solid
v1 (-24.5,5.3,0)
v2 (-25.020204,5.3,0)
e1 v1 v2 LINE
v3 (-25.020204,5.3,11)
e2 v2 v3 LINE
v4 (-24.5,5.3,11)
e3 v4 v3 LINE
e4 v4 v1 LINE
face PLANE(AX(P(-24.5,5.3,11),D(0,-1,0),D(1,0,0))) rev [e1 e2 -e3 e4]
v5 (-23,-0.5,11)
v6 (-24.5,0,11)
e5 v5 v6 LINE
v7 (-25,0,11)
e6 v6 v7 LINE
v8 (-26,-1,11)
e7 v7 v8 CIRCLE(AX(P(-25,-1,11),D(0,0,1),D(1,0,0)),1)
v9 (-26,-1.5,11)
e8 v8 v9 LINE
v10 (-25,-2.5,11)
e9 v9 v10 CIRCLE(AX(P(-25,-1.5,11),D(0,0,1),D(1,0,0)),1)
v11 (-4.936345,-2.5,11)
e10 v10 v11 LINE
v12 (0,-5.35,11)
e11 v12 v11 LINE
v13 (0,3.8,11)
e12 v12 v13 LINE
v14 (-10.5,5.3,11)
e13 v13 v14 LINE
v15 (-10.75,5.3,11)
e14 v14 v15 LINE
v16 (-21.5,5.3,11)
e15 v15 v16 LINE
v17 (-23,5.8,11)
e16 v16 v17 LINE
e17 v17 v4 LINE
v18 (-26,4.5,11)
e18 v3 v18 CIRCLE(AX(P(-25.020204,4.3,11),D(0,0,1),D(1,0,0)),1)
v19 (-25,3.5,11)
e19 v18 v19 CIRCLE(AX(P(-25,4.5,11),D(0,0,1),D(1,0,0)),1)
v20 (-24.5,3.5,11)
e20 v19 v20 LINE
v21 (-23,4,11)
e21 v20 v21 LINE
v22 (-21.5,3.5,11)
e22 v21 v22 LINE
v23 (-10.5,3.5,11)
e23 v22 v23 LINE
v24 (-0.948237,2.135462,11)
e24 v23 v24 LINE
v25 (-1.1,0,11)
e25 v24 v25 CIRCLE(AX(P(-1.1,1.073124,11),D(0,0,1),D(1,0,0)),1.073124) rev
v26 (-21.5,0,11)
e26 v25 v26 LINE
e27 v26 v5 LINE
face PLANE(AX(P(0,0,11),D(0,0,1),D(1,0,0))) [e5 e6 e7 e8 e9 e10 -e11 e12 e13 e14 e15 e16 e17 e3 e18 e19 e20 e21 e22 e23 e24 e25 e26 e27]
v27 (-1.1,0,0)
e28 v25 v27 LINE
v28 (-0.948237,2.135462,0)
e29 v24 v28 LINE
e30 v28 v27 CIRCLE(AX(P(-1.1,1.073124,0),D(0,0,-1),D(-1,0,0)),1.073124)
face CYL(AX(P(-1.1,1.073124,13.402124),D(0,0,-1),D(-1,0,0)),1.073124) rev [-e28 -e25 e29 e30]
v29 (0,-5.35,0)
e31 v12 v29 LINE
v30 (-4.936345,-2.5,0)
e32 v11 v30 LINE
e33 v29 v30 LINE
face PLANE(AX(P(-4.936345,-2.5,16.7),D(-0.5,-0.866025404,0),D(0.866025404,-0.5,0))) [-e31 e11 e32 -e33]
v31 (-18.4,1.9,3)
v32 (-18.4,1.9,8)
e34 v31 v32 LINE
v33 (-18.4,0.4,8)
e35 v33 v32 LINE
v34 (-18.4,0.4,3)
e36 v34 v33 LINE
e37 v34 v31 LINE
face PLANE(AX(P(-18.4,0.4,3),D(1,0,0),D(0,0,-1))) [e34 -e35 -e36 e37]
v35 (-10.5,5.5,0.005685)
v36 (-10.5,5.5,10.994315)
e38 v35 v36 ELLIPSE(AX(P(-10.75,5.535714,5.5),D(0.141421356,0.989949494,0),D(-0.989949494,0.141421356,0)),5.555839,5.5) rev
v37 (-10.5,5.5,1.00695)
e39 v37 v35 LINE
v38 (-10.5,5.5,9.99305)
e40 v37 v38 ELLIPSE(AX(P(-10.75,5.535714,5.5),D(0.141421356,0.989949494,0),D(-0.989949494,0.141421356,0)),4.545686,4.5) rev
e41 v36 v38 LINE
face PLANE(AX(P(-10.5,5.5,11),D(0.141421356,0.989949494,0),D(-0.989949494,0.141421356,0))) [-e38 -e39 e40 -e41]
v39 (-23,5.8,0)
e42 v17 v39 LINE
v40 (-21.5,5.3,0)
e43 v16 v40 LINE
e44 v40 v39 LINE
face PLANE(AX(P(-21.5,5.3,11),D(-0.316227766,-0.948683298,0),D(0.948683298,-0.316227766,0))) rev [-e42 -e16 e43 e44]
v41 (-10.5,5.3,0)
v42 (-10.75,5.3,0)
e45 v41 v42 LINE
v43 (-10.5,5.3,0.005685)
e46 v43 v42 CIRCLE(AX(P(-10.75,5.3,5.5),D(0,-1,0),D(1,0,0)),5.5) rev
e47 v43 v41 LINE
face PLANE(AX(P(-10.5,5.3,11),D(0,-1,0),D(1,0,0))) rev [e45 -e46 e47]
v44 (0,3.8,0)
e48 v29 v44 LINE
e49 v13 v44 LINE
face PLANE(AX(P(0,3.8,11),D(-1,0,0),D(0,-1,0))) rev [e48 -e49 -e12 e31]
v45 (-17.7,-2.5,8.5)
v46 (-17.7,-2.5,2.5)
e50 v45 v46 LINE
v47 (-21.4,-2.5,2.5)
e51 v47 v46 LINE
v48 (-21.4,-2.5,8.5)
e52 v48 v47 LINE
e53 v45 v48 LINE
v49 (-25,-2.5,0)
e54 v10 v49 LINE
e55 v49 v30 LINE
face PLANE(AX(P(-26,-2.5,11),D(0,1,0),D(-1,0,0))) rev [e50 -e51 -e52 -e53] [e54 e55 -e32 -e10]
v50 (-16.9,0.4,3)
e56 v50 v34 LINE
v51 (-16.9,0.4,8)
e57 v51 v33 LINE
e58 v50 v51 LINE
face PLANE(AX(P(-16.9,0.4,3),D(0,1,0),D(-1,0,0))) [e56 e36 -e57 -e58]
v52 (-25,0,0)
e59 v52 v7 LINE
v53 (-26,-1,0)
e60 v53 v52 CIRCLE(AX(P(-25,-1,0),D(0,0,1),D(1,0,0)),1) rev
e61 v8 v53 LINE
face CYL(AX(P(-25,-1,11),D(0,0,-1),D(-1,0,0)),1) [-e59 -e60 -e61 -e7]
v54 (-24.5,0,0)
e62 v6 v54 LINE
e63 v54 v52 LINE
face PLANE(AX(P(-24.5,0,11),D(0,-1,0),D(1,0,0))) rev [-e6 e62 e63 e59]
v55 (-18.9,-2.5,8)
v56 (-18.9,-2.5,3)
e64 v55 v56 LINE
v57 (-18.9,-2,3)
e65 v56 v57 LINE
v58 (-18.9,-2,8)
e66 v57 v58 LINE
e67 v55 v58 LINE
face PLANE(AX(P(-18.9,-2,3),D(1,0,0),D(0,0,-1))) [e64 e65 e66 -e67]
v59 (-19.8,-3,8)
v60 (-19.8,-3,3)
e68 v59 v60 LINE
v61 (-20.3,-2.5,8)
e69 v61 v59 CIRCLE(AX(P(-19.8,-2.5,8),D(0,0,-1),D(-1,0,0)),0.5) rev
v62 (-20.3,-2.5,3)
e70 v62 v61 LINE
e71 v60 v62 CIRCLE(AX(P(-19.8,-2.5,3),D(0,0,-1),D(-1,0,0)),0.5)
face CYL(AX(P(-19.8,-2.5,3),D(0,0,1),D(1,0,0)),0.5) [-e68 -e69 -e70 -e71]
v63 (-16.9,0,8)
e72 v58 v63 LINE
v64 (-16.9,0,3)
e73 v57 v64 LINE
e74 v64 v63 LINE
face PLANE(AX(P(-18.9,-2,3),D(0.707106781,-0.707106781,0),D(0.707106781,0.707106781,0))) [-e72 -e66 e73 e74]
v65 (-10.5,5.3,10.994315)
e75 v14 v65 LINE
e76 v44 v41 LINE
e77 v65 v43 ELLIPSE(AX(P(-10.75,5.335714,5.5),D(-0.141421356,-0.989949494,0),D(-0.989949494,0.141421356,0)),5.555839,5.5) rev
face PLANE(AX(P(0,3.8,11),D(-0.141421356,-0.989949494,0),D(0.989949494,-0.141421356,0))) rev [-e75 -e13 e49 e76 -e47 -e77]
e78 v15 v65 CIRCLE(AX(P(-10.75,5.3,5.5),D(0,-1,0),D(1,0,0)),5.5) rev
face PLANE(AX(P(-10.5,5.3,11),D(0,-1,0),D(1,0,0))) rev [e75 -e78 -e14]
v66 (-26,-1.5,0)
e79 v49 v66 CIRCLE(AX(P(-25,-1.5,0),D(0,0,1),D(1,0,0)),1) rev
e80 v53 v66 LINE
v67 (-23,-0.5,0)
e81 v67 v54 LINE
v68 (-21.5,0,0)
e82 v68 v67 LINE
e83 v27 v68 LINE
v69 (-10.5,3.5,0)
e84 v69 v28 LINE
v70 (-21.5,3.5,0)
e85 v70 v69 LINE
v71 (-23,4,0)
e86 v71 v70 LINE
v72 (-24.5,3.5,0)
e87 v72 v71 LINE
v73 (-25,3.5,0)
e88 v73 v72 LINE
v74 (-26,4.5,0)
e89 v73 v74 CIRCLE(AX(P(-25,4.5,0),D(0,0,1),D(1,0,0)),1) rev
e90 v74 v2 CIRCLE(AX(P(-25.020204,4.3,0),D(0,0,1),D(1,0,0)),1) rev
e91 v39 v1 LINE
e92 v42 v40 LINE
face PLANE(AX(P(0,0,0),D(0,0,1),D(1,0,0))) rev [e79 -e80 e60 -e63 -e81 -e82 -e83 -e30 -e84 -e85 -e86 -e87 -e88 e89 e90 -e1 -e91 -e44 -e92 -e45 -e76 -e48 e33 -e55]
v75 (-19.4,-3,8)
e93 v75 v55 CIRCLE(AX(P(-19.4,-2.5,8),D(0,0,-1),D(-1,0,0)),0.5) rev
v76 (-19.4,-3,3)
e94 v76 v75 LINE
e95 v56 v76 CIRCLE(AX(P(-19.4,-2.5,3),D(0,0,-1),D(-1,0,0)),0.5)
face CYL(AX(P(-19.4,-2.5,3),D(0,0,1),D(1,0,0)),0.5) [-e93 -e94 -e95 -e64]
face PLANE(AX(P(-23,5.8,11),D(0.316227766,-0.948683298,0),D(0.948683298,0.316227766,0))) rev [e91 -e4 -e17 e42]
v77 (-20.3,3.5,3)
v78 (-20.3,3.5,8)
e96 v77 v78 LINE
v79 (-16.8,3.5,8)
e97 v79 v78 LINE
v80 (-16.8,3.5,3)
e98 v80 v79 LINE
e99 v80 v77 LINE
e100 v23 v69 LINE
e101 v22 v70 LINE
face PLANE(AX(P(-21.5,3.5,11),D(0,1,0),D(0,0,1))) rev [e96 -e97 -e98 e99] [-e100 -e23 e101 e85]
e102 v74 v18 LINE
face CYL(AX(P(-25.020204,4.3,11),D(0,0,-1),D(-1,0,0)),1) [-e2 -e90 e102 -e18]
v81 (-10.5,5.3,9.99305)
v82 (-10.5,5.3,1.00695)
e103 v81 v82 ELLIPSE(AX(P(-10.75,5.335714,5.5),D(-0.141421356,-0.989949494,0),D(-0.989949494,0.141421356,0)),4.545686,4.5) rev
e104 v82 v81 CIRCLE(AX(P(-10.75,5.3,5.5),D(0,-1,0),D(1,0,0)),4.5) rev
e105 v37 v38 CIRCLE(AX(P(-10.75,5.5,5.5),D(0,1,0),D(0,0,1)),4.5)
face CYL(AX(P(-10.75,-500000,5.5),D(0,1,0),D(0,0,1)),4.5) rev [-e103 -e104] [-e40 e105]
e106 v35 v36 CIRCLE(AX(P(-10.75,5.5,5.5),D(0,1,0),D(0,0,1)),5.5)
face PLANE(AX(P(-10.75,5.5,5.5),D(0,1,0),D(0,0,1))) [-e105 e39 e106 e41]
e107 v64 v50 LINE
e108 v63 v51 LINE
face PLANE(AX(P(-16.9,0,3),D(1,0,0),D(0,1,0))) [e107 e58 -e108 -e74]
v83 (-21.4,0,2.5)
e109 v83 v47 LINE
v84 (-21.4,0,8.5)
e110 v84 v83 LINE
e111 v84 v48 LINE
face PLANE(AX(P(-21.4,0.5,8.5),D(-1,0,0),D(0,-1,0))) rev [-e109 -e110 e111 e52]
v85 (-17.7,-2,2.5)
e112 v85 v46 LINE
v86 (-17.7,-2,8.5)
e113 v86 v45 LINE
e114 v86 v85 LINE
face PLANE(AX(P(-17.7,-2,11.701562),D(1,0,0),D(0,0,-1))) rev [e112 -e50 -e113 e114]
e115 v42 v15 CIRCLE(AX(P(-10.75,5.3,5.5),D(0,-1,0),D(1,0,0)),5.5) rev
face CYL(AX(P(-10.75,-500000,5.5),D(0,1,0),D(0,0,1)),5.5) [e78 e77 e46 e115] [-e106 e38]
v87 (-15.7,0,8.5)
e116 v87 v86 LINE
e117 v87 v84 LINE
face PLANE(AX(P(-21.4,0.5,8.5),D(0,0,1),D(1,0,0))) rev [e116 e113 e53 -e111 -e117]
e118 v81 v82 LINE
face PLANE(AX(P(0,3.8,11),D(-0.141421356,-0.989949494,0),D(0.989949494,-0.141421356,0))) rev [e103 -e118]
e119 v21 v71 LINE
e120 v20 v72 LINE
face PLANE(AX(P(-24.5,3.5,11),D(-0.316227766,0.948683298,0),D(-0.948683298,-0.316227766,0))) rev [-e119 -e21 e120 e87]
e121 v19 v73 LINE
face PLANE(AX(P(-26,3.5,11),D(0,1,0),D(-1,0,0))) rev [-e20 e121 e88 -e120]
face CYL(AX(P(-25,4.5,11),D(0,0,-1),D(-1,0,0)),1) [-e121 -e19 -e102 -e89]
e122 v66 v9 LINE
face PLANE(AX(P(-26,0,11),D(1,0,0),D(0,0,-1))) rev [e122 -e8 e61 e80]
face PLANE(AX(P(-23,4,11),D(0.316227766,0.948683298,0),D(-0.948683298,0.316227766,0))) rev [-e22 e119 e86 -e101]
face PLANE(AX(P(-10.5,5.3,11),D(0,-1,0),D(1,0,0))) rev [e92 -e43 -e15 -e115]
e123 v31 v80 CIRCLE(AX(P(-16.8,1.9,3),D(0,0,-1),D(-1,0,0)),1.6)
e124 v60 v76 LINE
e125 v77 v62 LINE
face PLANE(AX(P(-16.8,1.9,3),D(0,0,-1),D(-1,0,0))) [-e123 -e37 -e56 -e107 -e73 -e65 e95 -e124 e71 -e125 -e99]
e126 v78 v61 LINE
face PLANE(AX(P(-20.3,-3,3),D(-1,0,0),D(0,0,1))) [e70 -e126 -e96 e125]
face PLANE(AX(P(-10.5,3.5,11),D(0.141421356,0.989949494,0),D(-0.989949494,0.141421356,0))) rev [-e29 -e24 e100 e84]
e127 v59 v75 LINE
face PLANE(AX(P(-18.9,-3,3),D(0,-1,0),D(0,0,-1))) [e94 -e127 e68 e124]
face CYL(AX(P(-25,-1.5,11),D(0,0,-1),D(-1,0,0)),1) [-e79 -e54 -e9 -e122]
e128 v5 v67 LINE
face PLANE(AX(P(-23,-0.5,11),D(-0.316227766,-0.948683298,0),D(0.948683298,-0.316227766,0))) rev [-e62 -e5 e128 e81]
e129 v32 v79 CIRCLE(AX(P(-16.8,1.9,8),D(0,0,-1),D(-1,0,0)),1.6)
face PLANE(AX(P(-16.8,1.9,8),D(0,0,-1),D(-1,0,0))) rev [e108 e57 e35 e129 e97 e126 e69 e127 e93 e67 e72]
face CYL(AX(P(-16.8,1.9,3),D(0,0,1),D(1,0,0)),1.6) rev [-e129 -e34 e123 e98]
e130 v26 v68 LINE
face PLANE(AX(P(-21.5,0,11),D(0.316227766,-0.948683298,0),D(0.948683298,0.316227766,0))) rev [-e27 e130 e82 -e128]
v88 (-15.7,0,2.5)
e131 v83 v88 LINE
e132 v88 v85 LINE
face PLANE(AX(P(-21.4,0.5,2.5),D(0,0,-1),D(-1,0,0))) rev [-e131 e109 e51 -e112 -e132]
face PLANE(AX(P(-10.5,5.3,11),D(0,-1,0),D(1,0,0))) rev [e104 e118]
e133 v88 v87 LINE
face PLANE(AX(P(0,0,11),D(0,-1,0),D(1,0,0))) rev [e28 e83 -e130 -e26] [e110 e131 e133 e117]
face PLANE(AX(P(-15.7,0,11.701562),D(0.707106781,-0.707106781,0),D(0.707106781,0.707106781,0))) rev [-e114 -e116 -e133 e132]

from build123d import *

# Parameters (mm, degrees)
BOSS_EXTRUDE1_DEPTH   = 11
BOSS_EXTRUDE1_2_DEPTH = 11
SKETCH2_W             = 5.7
SKETCH2_H             = 6
CUT_EXTRUDE1_DEPTH    = 3
BOSS_EXTRUDE8_DEPTH   = 11
BOSS_EXTRUDE2_DEPTH   = 6
BOSS_EXTRUDE3_START   = -5.5
BOSS_EXTRUDE3_DEPTH   = 2.5
FILLET7_R             = 1
FILLET8_R             = 1
FILLET10_R            = 1
FILLET11_R            = 1
FILLET12_R            = 0.5
BOSS_EXTRUDE7_REACH   = 36.321
BOSS_EXTRUDE7_START   = 5.5
SKETCH6_R             = 5.5
SKETCH6_R_2           = 4.5
CUT_EXTRUDE3_DEPTH    = 29.820825804
BOSS_EXTRUDE9_DEPTH   = 11


with BuildPart() as part:
    # Sketch1 → Boss-Extrude1 (new body)
    with BuildSketch(Plane.XY):
        Polygon((0, 3.8), (0, 2), (-10.5, 3.5), (-21.5, 3.5), (-23, 4), (-24.5, 3.5), (-26, 3.5), (-26, 5.3), (-24.5, 5.3), (-23, 5.8), (-21.5, 5.3), (-10.5, 5.3), align=None)
    extrude(amount=BOSS_EXTRUDE1_DEPTH)



with BuildPart() as body_2:
    # Sketch1 → Boss-Extrude1 2 (new body)
    with BuildSketch(Plane.XY):
        Polygon((0, 0), (0, -2.5), (-26, -2.5), (-26, 0), (-24.5, 0), (-23, -0.5), (-21.5, 0), align=None)
    extrude(amount=BOSS_EXTRUDE1_2_DEPTH)

    # Sketch2 → Cut-Extrude1 (cut)
    with BuildSketch(Plane.XZ.offset(2.5)):
        with Locations((-18.55, 5.5)):
            Rectangle(SKETCH2_W, SKETCH2_H)
    extrude(amount=-CUT_EXTRUDE1_DEPTH, mode=Mode.SUBTRACT)


with BuildPart() as part_1:
    add(part.part)

    add(body_2.part)  # Boss-Extrude8 merges body 2
    # Sketch8 → Boss-Extrude8 (add)
    with BuildSketch(Plane(origin=(0, 0, 0), x_dir=(-1, 0, 0), z_dir=(0, 0, -1))):
        with BuildLine():
            Line((0.948237354, 2.135462479), (0, 2))
            Line((0, 2), (0, 0))
            Line((0, 0), (1.1, 0))
            ThreePointArc((1.1, 0), (0.029575797, 0.997051253), (0.948237354, 2.135462479))
        make_face()
    extrude(amount=-BOSS_EXTRUDE8_DEPTH)

    # Sketch3 → Boss-Extrude2 (add)
    with BuildSketch(Plane.XY.offset(2.5)):
        Polygon((-15.7, 0), (-17.7, -2), (-17.7, -2.5), (-15.7, -2.5), align=None)
    extrude(amount=BOSS_EXTRUDE2_DEPTH)

    # Sketch4 → Boss-Extrude3 (add, symmetric)
    with BuildSketch(Plane.XY.offset(11).offset(BOSS_EXTRUDE3_START)):
        with BuildLine():
            Line((-18.9, -2), (-16.9, 0))
            Line((-16.9, 0), (-16.9, 0.4))
            Line((-16.9, 0.4), (-18.4, 0.4))
            Line((-18.4, 0.4), (-18.4, 1.9))
            ThreePointArc((-18.4, 1.9), (-17.93137085, 3.03137085), (-16.8, 3.5))
            Line((-16.8, 3.5), (-20.3, 3.5))
            Line((-20.3, 3.5), (-20.3, -3))
            Line((-20.3, -3), (-18.9, -3))
            Line((-18.9, -3), (-18.9, -2))
        make_face()
    extrude(amount=BOSS_EXTRUDE3_DEPTH, both=True)

    # Fillet7
    fillet7_edges = [part_1.edges().sort_by_distance(p)[0] for p in [
        (-26, 0, 5.5),
    ]]
    fillet(fillet7_edges, radius=FILLET7_R)

    # Fillet8
    fillet8_edges = [part_1.edges().sort_by_distance(p)[0] for p in [
        (-26, 3.5, 5.5),
    ]]
    fillet(fillet8_edges, radius=FILLET8_R)

    # Fillet10
    # the kernel refuses this fillet: 1 mm, written as the material it takes off along each edge
    with BuildSketch(Plane(origin=(-26, 5.3, -2.449489743), x_dir=(1.6120438317551944e-12, -1.0, 0), z_dir=(0, 0, 1))) as fillet10_piece_1:
        with BuildLine():
            CenterArc((1, 0.979795897), FILLET10_R, 180, 78.463040967)
            Line((0, 0.979795897), (-0.02, 0.979795897))
            Line((-0.02, 0.979795897), (-0.02, 0))
            Line((-0.02, 0), (0, -0.02))
            ThreePointArc((0, -0.02), (0.4, -0.02), (0.796, -0.019595918))
            Line((0.796, -0.019595918), (0.8, 0))
        make_face()
    extrude(amount=15.898979486, mode=Mode.SUBTRACT)

    # Fillet11
    fillet11_edges = [part_1.edges().sort_by_distance(p)[0] for p in [
        (-26, -2.5, 5.5),
    ]]
    fillet(fillet11_edges, radius=FILLET11_R)

    # Fillet12
    fillet12_edges = [part_1.edges().sort_by_distance(p)[0] for p in [
        (-18.9, -3, 5.5),
        (-20.3, -3, 5.5),
    ]]
    fillet(fillet12_edges, radius=FILLET12_R)

    # Sketch6 → Boss-Extrude7 (add, up to next)
    with BuildSketch(Plane(origin=(0, 0, 0), x_dir=(1, 0, 0), z_dir=(0, 1, 0)).offset(BOSS_EXTRUDE7_START), mode=Mode.PRIVATE) as boss_extrude7_sk1:
        with Locations(Location((-10.75, -5.5, 0), (0, 0, 270))):
            Circle(SKETCH6_R)
        with Locations(Location((-10.75, -5.5, 0), (0, 0, 270))):
            Circle(SKETCH6_R_2, mode=Mode.SUBTRACT)
    boss_extrude7_tool1 = extrude(boss_extrude7_sk1.sketch, amount=-BOSS_EXTRUDE7_REACH, mode=Mode.PRIVATE) - part_1.part
    add(boss_extrude7_tool1.solids().sort_by_distance((-10.75, 5.5, 0.155563))[0])

    # Sketch7 → Cut-Extrude3 (cut, through all)
    with BuildSketch(Plane.XY):
        Polygon((-10.5, 5.5), (-0.5, 4.071428571), (-0.5, 5.5), align=None)
    extrude(amount=CUT_EXTRUDE3_DEPTH, mode=Mode.SUBTRACT)

    # Sketch10 → Boss-Extrude9 (add)
    with BuildSketch(Plane(origin=(0, 0, 0), x_dir=(-1, 0, 0), z_dir=(0, 0, -1))):
        Polygon((0, -2.5), (4.936344802, -2.5), (0, -5.35), align=None)
    extrude(amount=-BOSS_EXTRUDE9_DEPTH)


solid = part_1.part
